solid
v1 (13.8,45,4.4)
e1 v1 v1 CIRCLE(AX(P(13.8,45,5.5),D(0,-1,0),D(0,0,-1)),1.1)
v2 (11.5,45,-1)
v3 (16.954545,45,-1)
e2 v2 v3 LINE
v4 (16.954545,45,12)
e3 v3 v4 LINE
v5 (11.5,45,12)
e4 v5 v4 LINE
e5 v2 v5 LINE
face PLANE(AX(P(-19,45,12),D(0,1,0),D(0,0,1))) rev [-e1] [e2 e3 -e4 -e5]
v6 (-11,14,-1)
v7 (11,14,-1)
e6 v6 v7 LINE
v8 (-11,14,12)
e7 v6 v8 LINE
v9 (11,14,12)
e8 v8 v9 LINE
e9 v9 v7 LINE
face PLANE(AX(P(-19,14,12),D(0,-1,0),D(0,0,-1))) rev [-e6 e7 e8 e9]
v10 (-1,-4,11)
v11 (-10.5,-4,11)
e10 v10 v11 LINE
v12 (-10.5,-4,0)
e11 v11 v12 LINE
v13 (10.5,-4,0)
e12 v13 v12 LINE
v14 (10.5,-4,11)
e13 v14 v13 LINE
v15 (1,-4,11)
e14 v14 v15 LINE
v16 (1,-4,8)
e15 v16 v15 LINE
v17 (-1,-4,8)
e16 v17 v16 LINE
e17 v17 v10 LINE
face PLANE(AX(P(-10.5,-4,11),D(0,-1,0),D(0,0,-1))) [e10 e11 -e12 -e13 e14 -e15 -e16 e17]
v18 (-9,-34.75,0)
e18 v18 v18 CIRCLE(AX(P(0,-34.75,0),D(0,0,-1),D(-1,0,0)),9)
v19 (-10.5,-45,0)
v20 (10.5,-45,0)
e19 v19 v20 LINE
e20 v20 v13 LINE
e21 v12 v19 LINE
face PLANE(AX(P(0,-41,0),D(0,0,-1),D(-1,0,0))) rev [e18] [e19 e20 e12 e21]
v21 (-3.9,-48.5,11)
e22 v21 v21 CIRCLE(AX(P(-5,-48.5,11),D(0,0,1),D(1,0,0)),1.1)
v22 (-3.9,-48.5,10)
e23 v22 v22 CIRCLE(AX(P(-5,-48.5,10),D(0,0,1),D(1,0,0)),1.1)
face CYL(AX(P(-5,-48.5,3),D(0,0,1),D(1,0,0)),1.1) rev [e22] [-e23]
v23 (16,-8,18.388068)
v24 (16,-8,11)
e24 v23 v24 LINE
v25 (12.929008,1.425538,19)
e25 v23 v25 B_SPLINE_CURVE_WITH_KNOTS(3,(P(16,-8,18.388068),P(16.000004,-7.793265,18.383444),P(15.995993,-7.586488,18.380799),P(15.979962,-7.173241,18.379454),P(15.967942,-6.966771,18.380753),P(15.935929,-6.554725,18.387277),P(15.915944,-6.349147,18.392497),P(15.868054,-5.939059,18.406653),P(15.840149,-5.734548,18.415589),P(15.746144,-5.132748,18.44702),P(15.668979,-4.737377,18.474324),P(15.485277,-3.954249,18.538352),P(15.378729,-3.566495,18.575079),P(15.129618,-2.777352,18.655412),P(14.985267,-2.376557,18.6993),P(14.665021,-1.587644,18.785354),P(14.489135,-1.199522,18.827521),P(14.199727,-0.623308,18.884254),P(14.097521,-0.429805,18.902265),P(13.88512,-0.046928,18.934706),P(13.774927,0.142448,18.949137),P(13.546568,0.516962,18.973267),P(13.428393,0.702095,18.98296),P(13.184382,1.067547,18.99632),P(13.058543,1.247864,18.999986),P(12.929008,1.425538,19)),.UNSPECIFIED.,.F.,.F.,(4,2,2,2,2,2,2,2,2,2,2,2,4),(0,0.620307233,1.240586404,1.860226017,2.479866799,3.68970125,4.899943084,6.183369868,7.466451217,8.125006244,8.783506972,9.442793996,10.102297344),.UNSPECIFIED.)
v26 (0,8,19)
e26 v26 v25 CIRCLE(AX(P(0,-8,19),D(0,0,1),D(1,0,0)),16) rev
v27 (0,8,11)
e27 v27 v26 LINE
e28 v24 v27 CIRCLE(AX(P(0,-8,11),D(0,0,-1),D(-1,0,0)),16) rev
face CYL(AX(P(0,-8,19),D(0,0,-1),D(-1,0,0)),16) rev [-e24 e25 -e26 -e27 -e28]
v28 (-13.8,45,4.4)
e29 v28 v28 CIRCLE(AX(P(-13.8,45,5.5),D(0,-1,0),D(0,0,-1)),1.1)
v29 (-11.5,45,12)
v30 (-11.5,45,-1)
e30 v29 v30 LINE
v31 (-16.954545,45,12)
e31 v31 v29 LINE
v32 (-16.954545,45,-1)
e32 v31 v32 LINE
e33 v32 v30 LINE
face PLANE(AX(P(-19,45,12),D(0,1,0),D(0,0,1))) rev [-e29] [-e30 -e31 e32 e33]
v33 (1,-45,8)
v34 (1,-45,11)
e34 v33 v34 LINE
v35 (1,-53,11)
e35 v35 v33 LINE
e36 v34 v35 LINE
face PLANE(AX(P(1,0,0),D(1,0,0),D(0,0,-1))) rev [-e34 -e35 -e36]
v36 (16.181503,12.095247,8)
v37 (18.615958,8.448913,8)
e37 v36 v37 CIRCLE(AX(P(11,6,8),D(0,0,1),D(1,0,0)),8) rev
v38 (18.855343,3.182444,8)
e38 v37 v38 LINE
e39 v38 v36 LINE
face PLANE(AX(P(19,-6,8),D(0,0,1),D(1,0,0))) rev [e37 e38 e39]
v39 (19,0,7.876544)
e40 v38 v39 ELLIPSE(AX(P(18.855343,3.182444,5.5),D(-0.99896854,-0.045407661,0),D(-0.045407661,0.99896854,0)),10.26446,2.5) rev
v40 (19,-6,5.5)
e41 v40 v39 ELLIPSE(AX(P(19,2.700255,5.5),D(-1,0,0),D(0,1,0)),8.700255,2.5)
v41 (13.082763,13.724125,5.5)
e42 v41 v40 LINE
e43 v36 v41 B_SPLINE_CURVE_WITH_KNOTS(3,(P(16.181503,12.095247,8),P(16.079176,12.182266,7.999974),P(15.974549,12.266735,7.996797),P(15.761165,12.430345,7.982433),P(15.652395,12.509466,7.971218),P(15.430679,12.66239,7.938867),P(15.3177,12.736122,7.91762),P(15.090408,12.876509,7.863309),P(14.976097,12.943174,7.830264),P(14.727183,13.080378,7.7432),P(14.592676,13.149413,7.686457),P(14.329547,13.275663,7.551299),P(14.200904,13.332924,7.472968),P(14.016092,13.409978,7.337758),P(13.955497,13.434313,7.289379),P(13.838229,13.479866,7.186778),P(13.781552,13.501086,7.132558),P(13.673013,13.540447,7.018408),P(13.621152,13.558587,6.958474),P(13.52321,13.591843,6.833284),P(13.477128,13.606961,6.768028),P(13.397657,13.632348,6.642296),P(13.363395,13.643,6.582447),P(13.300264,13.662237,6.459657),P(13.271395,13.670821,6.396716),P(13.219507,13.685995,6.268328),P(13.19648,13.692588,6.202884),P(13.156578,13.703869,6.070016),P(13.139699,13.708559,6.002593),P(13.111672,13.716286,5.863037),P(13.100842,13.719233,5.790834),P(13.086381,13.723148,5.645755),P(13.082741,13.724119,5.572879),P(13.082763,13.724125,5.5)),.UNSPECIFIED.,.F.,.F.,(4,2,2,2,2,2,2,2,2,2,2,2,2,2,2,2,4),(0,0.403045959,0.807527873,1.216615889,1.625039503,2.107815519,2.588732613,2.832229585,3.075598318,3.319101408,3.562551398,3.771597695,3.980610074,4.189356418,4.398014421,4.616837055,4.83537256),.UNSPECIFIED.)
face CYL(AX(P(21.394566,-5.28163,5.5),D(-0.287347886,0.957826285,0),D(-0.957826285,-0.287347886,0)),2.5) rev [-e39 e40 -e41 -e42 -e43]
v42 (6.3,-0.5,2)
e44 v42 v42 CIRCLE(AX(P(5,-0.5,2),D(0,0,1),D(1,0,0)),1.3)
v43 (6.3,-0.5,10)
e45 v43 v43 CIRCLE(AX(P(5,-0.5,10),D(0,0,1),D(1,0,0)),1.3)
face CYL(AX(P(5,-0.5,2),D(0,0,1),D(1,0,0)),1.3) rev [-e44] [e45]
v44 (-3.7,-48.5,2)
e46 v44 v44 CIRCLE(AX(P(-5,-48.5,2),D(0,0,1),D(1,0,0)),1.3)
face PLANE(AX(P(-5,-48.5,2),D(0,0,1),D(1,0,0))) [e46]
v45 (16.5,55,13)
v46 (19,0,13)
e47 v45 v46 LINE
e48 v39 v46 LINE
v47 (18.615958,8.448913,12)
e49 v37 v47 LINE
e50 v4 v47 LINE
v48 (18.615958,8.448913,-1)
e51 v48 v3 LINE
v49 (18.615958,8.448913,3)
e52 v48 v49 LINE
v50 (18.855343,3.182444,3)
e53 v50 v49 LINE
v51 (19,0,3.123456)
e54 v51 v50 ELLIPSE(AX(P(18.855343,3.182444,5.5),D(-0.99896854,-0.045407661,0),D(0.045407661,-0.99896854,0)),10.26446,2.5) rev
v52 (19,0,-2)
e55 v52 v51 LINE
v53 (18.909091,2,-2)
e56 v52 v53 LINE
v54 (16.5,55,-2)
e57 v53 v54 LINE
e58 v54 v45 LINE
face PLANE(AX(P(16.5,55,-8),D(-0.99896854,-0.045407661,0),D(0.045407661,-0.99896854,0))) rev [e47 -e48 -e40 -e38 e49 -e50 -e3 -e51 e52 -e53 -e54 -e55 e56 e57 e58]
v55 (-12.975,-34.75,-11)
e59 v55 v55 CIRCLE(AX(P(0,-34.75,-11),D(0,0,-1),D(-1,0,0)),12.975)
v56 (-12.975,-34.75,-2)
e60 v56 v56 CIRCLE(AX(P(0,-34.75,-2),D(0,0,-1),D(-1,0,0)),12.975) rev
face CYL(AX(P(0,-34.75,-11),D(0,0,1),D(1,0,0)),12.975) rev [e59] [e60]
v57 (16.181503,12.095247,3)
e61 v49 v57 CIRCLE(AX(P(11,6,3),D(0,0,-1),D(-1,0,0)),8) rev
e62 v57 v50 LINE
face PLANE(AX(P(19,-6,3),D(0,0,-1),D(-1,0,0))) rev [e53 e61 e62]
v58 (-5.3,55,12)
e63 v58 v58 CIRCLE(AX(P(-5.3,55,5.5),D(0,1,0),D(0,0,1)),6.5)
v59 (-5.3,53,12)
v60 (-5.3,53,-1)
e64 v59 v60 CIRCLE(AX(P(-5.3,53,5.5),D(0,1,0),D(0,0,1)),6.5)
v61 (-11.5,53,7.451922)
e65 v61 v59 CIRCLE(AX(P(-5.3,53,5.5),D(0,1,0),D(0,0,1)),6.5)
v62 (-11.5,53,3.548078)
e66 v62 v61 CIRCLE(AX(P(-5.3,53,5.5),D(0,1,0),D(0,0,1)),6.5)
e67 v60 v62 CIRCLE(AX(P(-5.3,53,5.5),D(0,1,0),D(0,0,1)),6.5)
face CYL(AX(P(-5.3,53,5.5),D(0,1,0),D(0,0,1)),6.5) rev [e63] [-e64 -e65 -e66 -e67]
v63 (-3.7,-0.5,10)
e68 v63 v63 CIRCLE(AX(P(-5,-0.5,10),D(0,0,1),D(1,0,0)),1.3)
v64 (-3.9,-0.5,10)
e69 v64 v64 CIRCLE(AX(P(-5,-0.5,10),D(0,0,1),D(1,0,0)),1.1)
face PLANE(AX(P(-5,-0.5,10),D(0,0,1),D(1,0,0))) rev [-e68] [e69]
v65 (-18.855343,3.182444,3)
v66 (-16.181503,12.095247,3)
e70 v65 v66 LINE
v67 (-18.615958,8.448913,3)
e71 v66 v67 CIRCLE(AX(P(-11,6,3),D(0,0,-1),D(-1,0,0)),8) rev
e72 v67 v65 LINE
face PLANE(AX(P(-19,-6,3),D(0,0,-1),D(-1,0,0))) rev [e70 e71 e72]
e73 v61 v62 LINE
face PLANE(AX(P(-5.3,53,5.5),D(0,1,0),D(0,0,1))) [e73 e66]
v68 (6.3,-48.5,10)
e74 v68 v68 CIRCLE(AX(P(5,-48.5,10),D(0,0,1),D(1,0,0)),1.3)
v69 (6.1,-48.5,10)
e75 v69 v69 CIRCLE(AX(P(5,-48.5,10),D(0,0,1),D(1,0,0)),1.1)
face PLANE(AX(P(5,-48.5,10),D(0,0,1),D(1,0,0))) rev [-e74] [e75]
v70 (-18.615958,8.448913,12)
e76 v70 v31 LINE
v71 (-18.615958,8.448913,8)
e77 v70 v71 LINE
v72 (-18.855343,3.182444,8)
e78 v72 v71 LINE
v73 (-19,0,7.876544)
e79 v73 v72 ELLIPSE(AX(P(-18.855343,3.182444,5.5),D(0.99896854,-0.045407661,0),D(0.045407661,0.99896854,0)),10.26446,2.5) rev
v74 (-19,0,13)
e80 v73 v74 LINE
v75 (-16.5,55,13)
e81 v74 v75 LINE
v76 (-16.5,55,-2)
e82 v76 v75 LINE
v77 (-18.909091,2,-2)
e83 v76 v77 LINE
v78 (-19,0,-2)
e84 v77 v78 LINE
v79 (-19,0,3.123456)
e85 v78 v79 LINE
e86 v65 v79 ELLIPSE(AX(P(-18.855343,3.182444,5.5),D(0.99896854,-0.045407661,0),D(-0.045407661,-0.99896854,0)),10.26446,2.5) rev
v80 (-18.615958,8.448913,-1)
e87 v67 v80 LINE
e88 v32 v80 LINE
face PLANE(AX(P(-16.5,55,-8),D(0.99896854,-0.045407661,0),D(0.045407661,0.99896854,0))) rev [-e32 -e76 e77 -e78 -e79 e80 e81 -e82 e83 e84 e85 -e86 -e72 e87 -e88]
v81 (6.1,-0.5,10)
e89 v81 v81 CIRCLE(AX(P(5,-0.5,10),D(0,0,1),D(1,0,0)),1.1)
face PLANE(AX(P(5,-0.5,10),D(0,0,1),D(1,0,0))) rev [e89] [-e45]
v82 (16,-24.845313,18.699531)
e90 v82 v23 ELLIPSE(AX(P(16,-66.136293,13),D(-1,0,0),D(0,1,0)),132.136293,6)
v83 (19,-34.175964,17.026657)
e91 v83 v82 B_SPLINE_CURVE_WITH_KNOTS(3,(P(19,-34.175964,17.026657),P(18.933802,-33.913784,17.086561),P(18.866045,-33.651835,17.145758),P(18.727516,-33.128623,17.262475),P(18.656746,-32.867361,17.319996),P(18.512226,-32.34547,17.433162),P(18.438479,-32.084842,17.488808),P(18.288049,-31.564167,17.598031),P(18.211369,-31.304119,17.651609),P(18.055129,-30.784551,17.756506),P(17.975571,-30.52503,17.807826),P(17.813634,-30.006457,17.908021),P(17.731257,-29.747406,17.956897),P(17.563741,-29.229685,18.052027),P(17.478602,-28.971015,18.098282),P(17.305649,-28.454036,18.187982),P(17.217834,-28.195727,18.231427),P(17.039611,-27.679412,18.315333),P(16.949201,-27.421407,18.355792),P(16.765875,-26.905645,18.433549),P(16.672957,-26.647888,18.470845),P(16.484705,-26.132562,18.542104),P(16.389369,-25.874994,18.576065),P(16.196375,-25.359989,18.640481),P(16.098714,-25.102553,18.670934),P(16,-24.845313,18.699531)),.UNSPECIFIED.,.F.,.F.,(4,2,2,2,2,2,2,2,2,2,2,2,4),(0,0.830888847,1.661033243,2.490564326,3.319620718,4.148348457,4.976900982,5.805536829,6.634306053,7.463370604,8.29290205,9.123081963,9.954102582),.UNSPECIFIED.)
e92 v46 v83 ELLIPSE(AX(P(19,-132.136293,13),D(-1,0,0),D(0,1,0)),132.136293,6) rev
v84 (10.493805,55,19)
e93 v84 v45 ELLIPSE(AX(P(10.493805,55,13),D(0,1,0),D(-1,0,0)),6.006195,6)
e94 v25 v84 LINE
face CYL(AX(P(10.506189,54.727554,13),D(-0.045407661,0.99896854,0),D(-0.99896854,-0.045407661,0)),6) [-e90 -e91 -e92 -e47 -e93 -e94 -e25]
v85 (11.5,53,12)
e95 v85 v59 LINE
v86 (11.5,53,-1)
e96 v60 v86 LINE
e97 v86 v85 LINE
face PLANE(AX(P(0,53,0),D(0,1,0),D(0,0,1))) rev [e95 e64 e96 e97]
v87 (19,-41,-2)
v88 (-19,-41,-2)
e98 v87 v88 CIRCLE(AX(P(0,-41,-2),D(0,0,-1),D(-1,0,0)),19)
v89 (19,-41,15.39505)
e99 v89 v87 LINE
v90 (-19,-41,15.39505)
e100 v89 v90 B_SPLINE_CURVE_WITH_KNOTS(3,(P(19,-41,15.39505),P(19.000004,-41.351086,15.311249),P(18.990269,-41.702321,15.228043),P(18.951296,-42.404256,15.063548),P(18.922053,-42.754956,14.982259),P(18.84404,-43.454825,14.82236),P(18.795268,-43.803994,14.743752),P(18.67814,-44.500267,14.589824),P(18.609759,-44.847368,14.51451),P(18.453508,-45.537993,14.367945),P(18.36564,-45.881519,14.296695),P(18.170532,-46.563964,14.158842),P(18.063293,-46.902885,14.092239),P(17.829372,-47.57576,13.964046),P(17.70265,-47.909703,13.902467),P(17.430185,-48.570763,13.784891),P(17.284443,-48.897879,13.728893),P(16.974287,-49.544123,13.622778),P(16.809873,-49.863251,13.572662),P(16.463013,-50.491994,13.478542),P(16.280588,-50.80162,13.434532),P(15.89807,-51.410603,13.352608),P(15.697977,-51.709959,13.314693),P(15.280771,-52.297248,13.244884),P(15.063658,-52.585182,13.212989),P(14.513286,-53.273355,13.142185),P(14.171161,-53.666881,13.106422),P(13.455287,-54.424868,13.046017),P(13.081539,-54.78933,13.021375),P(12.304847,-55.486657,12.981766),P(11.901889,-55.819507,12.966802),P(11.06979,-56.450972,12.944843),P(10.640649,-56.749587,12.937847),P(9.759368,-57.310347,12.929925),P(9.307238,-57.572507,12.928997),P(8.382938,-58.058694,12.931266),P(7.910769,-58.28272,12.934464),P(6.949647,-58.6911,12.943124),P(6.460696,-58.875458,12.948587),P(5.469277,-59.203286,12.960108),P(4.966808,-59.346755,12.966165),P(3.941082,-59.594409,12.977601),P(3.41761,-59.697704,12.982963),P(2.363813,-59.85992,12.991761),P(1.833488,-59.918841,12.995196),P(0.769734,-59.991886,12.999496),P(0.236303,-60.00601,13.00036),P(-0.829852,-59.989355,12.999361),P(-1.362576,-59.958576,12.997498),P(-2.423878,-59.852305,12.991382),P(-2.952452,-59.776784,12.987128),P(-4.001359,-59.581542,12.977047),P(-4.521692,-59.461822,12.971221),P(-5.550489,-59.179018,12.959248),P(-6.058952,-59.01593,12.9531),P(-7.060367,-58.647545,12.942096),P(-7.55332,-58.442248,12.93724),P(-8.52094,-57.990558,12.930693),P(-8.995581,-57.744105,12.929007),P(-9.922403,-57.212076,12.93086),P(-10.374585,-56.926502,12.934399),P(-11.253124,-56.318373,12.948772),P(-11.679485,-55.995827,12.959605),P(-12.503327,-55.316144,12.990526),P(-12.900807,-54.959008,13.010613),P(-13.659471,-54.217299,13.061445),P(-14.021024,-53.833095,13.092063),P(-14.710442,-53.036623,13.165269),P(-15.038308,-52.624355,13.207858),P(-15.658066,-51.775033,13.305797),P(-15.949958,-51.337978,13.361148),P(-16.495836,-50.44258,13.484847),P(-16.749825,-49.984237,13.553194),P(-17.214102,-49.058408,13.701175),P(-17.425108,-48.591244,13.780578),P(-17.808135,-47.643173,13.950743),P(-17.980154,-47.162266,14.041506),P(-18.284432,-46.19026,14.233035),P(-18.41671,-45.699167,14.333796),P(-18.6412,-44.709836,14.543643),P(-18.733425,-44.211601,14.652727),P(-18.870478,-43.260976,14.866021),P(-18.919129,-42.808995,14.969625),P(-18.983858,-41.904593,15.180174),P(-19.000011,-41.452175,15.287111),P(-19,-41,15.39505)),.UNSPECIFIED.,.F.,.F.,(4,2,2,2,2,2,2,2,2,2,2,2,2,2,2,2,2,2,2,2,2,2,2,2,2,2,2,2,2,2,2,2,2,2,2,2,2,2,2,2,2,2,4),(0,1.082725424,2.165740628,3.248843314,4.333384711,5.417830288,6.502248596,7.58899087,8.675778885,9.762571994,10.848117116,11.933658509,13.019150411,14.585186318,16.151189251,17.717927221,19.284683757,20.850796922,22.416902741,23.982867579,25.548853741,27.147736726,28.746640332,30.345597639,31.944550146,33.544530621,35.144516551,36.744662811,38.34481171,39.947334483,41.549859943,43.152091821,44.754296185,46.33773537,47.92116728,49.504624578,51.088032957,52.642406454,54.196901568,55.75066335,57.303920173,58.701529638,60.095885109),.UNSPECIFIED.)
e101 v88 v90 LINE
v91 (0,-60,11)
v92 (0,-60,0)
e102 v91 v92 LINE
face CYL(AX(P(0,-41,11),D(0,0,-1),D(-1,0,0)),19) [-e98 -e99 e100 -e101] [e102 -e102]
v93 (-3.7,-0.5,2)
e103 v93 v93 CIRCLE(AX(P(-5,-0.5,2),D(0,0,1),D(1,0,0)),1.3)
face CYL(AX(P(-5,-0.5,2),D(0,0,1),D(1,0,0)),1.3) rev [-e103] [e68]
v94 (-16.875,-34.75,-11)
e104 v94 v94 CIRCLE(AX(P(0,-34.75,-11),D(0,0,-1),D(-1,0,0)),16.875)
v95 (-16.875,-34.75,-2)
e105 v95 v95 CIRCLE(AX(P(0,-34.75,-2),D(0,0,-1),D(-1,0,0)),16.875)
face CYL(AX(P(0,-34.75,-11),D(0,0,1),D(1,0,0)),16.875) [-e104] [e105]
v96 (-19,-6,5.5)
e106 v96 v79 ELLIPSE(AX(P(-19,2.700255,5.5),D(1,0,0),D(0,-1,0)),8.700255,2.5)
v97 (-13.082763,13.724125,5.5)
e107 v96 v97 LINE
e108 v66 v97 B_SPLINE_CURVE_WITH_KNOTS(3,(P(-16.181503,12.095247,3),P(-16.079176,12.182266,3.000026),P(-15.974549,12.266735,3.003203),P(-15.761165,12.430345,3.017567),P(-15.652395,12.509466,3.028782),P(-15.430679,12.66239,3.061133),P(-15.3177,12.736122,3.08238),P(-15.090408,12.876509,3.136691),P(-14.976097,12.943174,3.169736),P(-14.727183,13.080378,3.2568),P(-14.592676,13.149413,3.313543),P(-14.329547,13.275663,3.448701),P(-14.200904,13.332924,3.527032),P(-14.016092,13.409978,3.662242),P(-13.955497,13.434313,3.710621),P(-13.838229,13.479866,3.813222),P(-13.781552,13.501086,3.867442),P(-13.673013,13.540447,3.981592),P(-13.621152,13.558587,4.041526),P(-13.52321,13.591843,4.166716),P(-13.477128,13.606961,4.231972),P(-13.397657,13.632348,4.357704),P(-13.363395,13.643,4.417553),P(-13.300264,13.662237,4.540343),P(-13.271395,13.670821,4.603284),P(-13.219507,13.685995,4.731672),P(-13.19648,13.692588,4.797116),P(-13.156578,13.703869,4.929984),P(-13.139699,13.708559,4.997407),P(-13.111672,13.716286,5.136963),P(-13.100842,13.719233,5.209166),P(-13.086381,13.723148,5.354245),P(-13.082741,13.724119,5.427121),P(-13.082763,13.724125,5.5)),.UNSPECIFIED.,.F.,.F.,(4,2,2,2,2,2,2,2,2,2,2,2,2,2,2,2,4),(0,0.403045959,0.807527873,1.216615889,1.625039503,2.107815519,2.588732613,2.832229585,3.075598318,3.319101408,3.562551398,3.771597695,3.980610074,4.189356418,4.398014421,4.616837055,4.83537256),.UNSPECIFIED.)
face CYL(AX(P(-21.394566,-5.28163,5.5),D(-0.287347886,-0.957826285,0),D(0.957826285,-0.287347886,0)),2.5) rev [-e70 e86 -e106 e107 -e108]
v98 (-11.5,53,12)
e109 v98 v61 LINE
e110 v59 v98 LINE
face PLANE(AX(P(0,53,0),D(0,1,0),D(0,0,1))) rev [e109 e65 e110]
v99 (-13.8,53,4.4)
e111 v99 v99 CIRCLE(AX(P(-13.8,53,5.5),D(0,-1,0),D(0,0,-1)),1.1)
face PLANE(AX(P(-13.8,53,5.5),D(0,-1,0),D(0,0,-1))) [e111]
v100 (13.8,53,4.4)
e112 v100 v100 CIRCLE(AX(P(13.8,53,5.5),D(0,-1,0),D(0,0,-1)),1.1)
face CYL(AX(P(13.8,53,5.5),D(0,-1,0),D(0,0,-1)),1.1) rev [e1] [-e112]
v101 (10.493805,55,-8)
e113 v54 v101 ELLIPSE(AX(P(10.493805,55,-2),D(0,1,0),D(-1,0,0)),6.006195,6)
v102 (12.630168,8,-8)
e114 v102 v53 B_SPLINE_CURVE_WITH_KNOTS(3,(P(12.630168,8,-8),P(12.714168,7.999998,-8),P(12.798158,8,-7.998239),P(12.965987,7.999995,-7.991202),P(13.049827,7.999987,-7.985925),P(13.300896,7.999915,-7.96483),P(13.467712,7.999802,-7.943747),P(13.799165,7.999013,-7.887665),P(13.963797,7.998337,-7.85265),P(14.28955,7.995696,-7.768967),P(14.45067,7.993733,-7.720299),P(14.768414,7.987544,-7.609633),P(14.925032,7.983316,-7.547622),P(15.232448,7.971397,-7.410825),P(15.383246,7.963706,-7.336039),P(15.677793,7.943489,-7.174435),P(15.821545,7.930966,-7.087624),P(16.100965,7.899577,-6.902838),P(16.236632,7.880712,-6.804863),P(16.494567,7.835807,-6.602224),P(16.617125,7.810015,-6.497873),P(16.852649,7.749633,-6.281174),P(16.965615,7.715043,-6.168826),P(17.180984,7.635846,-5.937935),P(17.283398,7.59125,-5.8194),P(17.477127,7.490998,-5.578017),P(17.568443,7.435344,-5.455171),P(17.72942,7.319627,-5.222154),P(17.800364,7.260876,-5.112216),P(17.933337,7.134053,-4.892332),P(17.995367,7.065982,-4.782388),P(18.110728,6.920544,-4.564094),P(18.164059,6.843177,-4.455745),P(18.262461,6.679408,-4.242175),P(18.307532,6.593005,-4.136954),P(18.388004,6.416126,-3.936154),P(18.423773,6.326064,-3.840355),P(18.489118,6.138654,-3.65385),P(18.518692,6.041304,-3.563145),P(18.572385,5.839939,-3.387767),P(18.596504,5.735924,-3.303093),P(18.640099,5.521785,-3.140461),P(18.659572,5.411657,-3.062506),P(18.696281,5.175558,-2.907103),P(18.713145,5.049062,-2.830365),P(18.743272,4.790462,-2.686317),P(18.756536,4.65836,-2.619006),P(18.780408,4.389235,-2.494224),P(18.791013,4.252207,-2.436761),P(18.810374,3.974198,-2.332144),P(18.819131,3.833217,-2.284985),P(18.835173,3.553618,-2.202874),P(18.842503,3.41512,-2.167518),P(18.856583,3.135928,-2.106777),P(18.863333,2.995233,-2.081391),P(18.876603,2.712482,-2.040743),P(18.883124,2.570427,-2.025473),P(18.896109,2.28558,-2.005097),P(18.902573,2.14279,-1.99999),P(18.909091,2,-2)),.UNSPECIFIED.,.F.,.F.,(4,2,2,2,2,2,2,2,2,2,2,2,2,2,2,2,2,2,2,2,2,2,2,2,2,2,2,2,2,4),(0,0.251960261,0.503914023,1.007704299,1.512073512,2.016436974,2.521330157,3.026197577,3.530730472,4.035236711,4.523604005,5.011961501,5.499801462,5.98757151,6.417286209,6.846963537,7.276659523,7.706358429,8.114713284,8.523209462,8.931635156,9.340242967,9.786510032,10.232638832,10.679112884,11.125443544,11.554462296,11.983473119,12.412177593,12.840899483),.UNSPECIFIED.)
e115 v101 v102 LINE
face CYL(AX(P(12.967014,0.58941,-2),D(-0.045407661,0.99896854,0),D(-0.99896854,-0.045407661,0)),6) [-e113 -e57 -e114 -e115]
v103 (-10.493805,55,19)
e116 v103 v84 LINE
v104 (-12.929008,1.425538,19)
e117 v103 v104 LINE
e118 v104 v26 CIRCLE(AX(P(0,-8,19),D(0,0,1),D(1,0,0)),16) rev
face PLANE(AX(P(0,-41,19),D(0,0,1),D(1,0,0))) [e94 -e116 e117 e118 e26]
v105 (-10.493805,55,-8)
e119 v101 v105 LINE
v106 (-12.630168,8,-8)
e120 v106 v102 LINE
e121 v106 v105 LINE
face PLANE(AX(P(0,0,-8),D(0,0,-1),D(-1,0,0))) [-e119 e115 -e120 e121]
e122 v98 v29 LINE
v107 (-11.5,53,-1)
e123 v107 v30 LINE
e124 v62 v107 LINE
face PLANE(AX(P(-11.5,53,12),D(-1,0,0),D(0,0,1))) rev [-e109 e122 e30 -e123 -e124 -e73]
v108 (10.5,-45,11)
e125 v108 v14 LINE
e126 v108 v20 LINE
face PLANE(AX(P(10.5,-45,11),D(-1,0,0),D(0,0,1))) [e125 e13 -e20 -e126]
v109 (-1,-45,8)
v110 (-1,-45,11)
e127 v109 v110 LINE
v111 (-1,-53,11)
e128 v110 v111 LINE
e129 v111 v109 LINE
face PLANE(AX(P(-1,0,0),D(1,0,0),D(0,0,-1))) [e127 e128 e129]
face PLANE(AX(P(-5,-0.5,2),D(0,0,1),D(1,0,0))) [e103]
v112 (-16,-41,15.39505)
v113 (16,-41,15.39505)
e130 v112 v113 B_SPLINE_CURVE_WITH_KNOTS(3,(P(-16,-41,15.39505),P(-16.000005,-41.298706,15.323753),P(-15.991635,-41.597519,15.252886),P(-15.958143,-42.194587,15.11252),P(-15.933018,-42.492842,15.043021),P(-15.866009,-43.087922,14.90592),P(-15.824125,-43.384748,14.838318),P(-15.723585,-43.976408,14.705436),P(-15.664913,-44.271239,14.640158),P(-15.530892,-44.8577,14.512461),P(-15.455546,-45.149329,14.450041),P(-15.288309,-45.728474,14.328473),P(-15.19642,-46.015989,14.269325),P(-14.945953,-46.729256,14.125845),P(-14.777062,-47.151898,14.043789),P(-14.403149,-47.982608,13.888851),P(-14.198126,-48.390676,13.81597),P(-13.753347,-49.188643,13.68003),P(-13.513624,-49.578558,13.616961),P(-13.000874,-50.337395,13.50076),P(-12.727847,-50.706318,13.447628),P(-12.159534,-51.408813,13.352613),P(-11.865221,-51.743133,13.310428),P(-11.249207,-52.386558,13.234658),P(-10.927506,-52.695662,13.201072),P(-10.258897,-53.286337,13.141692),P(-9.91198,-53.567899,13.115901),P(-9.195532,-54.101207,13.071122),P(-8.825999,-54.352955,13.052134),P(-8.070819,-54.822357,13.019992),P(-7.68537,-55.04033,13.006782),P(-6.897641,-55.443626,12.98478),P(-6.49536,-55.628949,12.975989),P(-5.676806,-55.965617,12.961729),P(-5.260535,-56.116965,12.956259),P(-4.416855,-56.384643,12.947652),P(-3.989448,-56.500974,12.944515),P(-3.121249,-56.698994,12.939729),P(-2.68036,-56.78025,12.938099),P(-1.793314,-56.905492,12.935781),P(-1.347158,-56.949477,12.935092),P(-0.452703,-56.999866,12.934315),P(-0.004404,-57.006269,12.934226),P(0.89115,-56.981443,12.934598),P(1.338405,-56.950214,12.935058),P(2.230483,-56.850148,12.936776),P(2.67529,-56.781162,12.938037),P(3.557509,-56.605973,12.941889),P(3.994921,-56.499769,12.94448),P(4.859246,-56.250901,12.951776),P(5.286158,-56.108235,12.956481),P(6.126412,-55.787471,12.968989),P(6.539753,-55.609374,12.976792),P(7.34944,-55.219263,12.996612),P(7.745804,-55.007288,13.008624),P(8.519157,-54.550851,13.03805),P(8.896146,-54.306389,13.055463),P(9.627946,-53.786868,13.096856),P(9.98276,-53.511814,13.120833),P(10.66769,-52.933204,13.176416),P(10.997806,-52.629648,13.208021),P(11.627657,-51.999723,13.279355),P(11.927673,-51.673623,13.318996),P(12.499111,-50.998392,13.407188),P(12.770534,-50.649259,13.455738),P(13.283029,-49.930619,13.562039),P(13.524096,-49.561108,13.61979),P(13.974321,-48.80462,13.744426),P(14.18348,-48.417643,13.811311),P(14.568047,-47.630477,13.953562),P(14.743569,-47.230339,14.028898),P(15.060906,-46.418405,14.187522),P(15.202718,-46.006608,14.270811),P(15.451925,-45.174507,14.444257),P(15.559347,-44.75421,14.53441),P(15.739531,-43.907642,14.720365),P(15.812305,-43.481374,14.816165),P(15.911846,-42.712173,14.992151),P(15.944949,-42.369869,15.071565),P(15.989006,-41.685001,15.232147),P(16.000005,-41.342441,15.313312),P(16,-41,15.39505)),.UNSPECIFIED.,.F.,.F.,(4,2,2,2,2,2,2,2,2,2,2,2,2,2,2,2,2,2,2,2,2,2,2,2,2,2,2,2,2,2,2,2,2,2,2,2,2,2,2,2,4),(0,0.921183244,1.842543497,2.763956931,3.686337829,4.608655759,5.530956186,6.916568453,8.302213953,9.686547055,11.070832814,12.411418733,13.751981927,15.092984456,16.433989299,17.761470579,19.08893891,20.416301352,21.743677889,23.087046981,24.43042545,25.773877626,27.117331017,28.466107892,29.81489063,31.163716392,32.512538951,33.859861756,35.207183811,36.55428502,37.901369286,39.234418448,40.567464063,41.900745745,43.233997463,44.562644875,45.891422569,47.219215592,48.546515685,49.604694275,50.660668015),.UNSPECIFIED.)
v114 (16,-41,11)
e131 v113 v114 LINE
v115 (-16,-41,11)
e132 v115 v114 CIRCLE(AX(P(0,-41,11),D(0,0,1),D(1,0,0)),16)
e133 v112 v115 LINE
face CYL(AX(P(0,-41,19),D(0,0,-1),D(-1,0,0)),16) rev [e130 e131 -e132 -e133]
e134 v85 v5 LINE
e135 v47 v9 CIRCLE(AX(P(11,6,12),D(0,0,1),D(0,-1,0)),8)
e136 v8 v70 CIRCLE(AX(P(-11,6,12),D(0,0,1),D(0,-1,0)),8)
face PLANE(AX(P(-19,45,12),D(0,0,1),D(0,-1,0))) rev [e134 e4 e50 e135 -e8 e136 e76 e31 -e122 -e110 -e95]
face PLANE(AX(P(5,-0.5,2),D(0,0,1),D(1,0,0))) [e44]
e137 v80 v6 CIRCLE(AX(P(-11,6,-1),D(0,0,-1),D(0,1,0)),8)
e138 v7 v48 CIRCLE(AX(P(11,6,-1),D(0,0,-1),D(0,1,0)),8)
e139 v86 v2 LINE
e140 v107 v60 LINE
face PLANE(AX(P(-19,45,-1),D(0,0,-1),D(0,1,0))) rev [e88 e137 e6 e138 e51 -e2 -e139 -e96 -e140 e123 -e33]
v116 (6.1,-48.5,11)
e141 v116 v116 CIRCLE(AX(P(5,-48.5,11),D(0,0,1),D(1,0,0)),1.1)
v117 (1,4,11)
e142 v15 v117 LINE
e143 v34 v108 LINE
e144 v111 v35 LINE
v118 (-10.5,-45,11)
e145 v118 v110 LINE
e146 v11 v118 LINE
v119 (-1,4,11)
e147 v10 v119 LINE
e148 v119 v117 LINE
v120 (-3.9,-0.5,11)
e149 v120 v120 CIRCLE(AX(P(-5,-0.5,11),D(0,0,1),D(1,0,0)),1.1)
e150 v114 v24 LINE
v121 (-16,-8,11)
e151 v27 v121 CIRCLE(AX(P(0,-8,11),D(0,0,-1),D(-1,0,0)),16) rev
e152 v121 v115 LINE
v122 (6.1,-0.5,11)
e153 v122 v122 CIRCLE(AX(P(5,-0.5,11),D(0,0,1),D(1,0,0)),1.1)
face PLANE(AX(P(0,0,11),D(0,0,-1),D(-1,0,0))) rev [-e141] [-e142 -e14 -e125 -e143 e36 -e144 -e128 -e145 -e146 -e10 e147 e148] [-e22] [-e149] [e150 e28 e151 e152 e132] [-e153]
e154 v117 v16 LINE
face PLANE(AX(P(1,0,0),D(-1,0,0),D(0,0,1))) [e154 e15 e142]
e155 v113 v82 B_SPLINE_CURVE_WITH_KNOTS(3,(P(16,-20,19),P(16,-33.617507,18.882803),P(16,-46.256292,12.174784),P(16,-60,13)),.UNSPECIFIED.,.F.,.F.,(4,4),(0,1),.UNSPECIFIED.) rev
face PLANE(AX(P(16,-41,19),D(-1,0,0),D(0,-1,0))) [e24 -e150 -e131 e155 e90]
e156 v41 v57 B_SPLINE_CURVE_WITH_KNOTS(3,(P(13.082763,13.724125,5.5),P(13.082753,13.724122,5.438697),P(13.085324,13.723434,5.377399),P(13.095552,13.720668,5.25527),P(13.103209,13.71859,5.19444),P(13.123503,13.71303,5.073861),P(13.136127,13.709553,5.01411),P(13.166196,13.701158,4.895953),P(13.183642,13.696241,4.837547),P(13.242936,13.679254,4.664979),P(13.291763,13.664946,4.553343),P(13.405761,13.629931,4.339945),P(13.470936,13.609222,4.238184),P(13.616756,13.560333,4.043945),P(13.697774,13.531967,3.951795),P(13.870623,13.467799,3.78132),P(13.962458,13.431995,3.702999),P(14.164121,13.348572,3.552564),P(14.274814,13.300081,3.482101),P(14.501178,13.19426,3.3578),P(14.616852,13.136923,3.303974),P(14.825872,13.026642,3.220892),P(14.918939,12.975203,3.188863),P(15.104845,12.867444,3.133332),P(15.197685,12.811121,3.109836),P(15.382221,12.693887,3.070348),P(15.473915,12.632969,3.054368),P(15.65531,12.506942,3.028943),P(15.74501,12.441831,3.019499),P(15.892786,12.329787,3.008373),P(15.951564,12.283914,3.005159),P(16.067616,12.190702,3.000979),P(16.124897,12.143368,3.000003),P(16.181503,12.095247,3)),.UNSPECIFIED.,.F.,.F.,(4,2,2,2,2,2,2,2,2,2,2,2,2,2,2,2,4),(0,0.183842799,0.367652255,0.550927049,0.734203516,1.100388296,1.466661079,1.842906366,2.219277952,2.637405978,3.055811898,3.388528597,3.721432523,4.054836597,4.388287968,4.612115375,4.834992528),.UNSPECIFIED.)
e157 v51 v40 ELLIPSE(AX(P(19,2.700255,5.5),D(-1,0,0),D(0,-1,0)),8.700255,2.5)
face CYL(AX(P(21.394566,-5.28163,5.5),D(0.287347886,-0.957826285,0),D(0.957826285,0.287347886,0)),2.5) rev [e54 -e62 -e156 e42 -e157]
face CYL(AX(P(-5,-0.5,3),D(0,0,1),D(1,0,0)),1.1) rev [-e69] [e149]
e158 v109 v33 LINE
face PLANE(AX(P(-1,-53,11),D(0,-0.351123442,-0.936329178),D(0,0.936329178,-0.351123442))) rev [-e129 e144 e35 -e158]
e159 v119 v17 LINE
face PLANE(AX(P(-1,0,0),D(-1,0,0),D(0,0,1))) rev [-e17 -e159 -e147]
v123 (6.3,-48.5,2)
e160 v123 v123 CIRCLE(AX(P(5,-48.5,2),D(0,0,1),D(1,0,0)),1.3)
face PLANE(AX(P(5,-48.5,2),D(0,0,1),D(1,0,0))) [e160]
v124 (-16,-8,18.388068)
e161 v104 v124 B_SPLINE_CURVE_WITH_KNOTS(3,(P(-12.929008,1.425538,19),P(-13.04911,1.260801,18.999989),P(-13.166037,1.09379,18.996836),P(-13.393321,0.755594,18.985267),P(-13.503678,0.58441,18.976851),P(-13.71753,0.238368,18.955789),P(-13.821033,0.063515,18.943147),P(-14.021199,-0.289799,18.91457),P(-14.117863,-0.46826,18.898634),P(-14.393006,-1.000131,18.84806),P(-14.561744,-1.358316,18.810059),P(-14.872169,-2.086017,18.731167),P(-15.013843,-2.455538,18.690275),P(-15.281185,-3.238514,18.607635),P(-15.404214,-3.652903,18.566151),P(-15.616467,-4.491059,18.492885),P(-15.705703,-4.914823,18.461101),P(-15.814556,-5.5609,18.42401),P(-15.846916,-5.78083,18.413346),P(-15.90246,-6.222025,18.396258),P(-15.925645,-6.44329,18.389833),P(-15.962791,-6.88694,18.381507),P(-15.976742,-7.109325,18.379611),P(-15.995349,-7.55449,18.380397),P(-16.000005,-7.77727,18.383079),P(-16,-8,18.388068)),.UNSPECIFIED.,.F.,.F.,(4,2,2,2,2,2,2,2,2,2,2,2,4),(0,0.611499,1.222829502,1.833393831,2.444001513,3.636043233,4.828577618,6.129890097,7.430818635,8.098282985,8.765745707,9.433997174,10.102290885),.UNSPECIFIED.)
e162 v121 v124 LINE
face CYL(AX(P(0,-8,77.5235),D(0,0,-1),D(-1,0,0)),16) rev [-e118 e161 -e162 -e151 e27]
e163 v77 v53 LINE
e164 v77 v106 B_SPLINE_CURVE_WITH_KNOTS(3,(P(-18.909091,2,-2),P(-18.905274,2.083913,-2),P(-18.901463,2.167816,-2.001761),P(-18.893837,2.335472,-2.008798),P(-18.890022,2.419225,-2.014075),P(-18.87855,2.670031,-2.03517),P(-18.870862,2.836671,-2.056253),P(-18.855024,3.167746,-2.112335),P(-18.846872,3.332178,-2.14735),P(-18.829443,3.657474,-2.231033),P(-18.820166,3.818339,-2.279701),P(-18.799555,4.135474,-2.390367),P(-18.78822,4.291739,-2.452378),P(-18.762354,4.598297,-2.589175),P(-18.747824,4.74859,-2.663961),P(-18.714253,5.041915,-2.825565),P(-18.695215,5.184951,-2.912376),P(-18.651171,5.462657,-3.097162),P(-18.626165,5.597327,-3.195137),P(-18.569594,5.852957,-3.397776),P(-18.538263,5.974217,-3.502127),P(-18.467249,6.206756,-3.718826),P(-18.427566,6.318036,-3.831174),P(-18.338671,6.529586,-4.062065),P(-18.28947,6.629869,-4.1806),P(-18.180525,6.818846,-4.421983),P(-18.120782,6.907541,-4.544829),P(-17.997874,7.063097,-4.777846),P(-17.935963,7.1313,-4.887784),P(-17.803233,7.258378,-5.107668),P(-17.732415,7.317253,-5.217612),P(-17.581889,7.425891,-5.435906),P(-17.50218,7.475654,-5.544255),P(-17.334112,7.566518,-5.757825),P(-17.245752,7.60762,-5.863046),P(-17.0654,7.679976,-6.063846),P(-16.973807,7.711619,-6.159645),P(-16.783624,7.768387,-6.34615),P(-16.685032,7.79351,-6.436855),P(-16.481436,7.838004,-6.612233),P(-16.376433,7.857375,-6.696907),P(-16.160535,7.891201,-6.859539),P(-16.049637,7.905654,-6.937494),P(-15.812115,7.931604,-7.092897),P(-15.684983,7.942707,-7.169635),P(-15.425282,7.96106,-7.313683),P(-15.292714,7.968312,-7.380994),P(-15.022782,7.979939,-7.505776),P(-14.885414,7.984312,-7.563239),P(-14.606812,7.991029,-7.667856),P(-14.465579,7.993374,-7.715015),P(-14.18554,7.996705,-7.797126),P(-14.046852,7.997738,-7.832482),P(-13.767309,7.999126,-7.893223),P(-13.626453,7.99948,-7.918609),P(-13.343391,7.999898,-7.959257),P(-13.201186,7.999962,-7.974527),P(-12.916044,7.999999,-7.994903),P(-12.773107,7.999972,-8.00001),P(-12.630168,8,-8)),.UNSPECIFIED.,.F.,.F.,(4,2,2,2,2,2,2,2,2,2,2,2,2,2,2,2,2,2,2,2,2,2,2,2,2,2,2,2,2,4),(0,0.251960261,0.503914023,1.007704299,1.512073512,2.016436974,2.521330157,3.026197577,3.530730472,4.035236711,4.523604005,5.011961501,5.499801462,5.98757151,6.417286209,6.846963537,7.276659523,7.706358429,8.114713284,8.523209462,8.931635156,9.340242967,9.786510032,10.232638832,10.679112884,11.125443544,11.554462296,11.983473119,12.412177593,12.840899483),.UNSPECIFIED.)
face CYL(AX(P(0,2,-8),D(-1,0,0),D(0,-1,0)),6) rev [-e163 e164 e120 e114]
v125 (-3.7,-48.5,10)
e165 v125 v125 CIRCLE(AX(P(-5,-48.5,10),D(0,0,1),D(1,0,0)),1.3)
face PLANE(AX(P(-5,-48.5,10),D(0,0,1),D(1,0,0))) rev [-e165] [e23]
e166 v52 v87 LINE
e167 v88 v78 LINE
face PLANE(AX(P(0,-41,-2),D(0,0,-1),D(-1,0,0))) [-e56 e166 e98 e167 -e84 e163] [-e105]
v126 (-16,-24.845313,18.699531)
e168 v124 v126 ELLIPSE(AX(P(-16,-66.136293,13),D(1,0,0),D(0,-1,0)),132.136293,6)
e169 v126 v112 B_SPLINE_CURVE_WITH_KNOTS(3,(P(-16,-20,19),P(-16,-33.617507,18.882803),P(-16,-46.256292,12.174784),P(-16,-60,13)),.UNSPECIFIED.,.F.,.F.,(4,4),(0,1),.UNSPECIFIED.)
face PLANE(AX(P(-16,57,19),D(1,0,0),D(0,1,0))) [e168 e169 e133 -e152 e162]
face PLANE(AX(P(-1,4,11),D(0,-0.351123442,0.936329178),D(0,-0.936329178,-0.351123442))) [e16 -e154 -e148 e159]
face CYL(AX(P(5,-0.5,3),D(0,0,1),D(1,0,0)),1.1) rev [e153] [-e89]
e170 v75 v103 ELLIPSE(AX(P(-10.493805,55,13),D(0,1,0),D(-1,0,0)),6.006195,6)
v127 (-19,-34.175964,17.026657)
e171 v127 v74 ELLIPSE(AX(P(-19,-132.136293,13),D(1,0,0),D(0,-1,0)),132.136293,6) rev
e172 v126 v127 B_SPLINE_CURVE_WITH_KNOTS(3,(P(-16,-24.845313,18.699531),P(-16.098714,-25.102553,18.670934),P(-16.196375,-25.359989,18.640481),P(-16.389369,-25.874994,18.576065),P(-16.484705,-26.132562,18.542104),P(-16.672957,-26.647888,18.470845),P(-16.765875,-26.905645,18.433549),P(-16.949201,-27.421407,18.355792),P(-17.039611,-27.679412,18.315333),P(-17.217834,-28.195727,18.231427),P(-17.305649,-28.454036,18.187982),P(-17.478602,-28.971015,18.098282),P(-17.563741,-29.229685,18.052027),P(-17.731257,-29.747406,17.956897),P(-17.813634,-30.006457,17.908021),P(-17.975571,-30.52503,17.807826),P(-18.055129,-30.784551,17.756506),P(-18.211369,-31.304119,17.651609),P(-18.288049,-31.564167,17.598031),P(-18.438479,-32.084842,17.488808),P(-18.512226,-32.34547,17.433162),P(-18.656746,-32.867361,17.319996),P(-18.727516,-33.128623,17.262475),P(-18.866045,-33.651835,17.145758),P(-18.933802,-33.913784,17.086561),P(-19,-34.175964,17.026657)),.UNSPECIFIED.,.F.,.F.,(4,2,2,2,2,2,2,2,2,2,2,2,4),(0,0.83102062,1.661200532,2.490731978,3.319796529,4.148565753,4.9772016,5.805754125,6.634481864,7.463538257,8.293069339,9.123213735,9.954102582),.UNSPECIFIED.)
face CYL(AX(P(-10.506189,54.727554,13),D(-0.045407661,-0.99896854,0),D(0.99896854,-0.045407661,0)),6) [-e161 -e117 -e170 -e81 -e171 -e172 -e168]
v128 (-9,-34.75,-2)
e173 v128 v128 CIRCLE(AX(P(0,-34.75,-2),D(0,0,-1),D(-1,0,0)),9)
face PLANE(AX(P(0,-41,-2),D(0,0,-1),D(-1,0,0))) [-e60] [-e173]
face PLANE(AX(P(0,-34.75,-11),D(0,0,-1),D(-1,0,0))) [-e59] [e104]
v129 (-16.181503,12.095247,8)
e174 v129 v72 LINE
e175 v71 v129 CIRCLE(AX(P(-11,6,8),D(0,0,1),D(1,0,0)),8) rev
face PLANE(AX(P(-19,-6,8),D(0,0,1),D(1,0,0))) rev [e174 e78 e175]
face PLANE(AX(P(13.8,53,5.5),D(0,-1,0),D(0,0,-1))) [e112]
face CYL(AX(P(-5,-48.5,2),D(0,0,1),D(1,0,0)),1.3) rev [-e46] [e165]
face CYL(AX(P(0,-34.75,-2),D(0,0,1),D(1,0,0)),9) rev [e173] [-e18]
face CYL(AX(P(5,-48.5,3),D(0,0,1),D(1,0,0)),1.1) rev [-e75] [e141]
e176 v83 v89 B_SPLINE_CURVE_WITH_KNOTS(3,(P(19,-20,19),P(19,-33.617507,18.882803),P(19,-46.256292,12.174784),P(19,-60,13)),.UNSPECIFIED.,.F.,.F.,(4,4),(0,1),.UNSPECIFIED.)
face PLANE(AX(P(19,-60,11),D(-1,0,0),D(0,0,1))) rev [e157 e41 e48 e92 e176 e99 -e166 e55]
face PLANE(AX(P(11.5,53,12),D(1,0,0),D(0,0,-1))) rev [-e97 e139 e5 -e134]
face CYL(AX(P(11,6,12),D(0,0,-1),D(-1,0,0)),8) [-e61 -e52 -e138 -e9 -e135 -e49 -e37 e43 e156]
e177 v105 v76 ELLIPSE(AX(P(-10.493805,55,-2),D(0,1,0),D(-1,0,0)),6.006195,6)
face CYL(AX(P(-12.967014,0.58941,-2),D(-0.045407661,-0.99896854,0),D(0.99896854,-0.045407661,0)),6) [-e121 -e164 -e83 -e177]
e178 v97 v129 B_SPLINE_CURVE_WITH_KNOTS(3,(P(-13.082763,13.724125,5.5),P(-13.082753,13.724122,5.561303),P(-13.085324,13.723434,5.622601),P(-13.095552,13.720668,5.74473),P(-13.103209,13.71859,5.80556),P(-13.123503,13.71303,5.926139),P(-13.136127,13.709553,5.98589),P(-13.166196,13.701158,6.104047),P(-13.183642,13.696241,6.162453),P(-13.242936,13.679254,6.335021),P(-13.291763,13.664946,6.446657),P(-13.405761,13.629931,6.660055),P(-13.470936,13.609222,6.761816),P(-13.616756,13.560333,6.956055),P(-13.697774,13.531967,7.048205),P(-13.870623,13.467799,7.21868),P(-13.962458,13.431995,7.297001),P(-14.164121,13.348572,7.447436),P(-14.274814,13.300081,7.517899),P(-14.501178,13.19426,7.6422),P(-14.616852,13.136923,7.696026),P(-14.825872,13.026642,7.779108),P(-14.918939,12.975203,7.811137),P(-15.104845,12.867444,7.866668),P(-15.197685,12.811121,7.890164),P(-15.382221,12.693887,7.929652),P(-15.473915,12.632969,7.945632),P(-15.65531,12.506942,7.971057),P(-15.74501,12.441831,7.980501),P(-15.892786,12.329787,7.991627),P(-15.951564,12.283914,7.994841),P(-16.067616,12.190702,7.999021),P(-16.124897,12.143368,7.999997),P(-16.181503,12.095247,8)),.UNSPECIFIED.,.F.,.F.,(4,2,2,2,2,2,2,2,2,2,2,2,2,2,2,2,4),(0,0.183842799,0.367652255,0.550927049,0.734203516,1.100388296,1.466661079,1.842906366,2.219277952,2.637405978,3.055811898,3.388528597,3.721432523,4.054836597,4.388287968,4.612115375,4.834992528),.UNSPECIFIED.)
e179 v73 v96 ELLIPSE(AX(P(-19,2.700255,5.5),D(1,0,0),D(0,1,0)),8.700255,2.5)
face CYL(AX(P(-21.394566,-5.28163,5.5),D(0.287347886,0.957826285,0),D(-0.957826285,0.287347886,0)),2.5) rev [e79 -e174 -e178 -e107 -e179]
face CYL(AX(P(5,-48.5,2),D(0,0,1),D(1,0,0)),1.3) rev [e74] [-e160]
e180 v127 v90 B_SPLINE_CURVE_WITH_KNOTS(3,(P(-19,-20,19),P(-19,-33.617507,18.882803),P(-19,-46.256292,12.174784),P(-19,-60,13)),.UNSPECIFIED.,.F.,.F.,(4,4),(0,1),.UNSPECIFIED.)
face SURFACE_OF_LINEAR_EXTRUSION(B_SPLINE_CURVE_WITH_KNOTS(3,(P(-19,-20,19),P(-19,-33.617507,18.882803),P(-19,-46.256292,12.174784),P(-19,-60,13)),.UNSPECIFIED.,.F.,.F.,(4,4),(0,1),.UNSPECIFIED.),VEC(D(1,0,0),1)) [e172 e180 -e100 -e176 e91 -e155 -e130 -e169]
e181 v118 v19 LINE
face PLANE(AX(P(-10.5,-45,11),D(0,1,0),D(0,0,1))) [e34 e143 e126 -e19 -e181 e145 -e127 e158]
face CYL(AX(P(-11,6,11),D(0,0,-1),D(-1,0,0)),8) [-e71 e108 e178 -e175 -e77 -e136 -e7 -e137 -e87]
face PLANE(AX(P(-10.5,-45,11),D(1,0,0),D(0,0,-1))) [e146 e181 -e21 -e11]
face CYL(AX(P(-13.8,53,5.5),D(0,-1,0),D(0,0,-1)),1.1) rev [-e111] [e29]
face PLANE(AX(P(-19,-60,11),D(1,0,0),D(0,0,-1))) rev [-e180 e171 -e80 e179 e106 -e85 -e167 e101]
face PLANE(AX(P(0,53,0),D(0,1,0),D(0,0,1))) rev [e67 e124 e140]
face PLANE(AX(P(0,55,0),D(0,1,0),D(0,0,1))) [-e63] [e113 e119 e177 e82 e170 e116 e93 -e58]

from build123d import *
from OCP.BRepFilletAPI import BRepFilletAPI_MakeChamfer

# Parameters (mm, degrees)
SKETCH1_W               = 38
SKETCH1_H               = 120
SKETCH1_W_2             = 21
SKETCH1_H_2             = 41
BOSS_EXTRUDE1_DEPTH     = 11
SKETCH3_R               = 1.3
CUT_EXTRUDE1_DEPTH      = 8
FILLET3_R               = 19
BOSS_EXTRUDE2_DEPTH     = 8
CUT_EXTRUDE2_DEPTH      = 66.741919656
CUT_EXTRUDE2_DEPTH_BACK = 66.741919656
SKETCH7_W               = 32
SKETCH7_H               = 49
BOSS_EXTRUDE4_DEPTH     = 8
SKETCH8_W               = 38
SKETCH8_H               = 52
BOSS_EXTRUDE5_DEPTH     = 8
BOSS_EXTRUDE6_START     = 2
SKETCH24_R              = 9
BOSS_EXTRUDE6_DEPTH     = 2
FILLET4_R               = 16
SKETCH26_W              = 38
SKETCH26_H              = 27
CUT_EXTRUDE4_DEPTH      = 5
SKETCH27_W              = 13
SKETCH27_H              = 31
CUT_EXTRUDE5_DEPTH      = 74.518705262
SKETCH29_W              = 23
SKETCH29_H              = 13
CUT_EXTRUDE7_DEPTH      = 8
SKETCH28_R              = 6.5
CUT_EXTRUDE8_DEPTH      = 2
SKETCH30_W              = 6
SKETCH30_H              = 5
CUT_EXTRUDE9_DEPTH      = 20
CHAMFER3_SIZE           = 6
CHAMFER3_SIZE_2         = 20
FILLET6_R               = 8
FILLET7_R               = 6
FILLET10_R              = 2.5
SKETCH31_R              = 1.1
CUT_EXTRUDE10_DEPTH     = 8
SKETCH32_R              = 1.1
CUT_EXTRUDE11_DEPTH     = 8
CUT_EXTRUDE13_DEPTH     = 69.483574828
FILLET11_R              = 6
SKETCH35_R              = 16.875
SKETCH35_R_2            = 12.975
BOSS_EXTRUDE7_DEPTH     = 9
CUT_EXTRUDE14_DEPTH     = 1


# Some blends are built 0.0001 mm under size
with BuildPart() as part:
    # Sketch1 → Boss-Extrude1 (new body)
    with BuildSketch(Plane.XY):
        Rectangle(SKETCH1_W, SKETCH1_H)
        with Locations((0, -24.5)):
            Rectangle(SKETCH1_W_2, SKETCH1_H_2, mode=Mode.SUBTRACT)
    extrude(amount=BOSS_EXTRUDE1_DEPTH)

    # Sketch3 → Cut-Extrude1 (cut)
    with BuildSketch(Plane.XY.offset(10)):
        with Locations((-5, -0.5)):
            Circle(SKETCH3_R)
        with Locations((5, -0.5)):
            Circle(SKETCH3_R)
        with Locations((5, -48.5)):
            Circle(SKETCH3_R)
        with Locations((-5, -48.5)):
            Circle(SKETCH3_R)
    extrude(amount=-CUT_EXTRUDE1_DEPTH, mode=Mode.SUBTRACT)

    # Fillet3
    fillet3_edges = [part.edges().sort_by_distance(p)[0] for p in [
        (19, -60, 5.5),
        (-19, -60, 5.5),
    ]]
    fillet(fillet3_edges, radius=FILLET3_R - 0.0001)  # a hair under: the kernel refuses the full size

    # Sketch4 → Boss-Extrude2 (add)
    with BuildSketch(Plane.XY.offset(11)):
        with BuildLine():
            Line((19, -41), (19, 60))
            Line((19, 60), (-19, 60))
            Line((-19, 60), (-19, -41))
            ThreePointArc((-19, -41), (-13.435028843, -54.435028843), (0, -60))
            ThreePointArc((0, -60), (13.435028843, -54.435028843), (19, -41))
        make_face()
        with BuildLine():
            Line((16, -41), (16, 57))
            Line((16, 57), (-16, 57))
            Line((-16, 57), (-16, -41))
            ThreePointArc((-16, -41), (-11.313708499, -52.313708499), (0, -57))
            ThreePointArc((0, -57), (11.313708499, -52.313708499), (16, -41))
        make_face(mode=Mode.SUBTRACT)
    extrude(amount=BOSS_EXTRUDE2_DEPTH)

    # Sketch6 → Cut-Extrude2 (cut, two sides: drawn at the far end of the back side and taken through both)
    with BuildSketch(Plane(origin=(0, 0, 0), x_dir=(0, 0, -1), z_dir=(1, 0, 0)).offset(-CUT_EXTRUDE2_DEPTH_BACK)):
        with BuildLine():
            Line((-19, -60), (-13, -60))
            Line((-13, -60), (-17, -35))
            Line((-17, -35), (-17.230341833, -33.272436255))
            add(Edge.make_bspline(
                [(-19, -20), (-18.961218666, -24.506149192), (-18.200739257, -28.905127919), (-17.230341833, -33.272436255)],
                knots=[0, 0, 0, 0, 0.330908527, 0.330908527, 0.330908527, 0.330908527], degree=3))
            Line((-19, -20), (-19, -60))
        make_face()
        with BuildLine():
            Line((-17, -35), (-13, -60))
            add(Edge.make_bspline(
                [(-17.230341833, -33.272436255), (-15.268214572, -42.103060212), (-12.44785515, -50.804202435), (-13, -60)],
                knots=[0.330908527, 0.330908527, 0.330908527, 0.330908527, 1, 1, 1, 1], degree=3))
            Line((-17.230341833, -33.272436255), (-17, -35))
        make_face()
    extrude(amount=CUT_EXTRUDE2_DEPTH + CUT_EXTRUDE2_DEPTH_BACK, mode=Mode.SUBTRACT)

    # Sketch7 → Boss-Extrude4 (add)
    with BuildSketch(Plane.XY.offset(11)):
        with Locations((0, 32.5)):
            Rectangle(SKETCH7_W, SKETCH7_H)
    extrude(amount=BOSS_EXTRUDE4_DEPTH)

    # Sketch8 → Boss-Extrude5 (add)
    with BuildSketch(Plane(origin=(0, 0, 0), x_dir=(-1, 0, 0), z_dir=(0, 0, -1))):
        with Locations((0, 34)):
            Rectangle(SKETCH8_W, SKETCH8_H)
    extrude(amount=BOSS_EXTRUDE5_DEPTH)

    # Sketch24 → Boss-Extrude6 (add)
    with BuildSketch(Plane(origin=(0, 0, 0), x_dir=(-1, 0, 0), z_dir=(0, 0, -1)).offset(BOSS_EXTRUDE6_START)):
        with BuildLine():
            Line((-19, 8), (-19, -41))
            ThreePointArc((-19, -41), (-13.435028843, -54.435028843), (0, -60))
            ThreePointArc((0, -60), (13.435028843, -54.435028843), (19, -41))
            Line((19, -41), (19, 8))
            Line((19, 8), (-19, 8))
        make_face()
        with Locations((0, -34.75)):
            Circle(SKETCH24_R, mode=Mode.SUBTRACT)
    extrude(amount=-BOSS_EXTRUDE6_DEPTH)

    # Fillet4
    fillet4_edges = [part.edges().sort_by_distance(p)[0] for p in [
        (-16, 8, 15),
        (16, 8, 15),
    ]]
    fillet(fillet4_edges, radius=FILLET4_R - 0.0001)  # a hair under: the kernel refuses the full size

    # Sketch26 → Cut-Extrude4 (cut)
    with BuildSketch(Plane(origin=(0, 60, 0), x_dir=(1, 0, 0), z_dir=(0, 1, 0))):
        with Locations((0, -5.5)):
            Rectangle(SKETCH26_W, SKETCH26_H)
    extrude(amount=-CUT_EXTRUDE4_DEPTH, mode=Mode.SUBTRACT)

    # Sketch27 → Cut-Extrude5 (cut, through all)
    with BuildSketch(Plane(origin=(19, 0, 0), x_dir=(0, 0, -1), z_dir=(1, 0, 0))):
        with Locations((-5.5, 29.5)):
            Rectangle(SKETCH27_W, SKETCH27_H)
    extrude(amount=-CUT_EXTRUDE5_DEPTH, mode=Mode.SUBTRACT)

    # Sketch29 → Cut-Extrude7 (cut)
    with BuildSketch(Plane.XZ.offset(-45)):
        with Locations((0, 5.5)):
            Rectangle(SKETCH29_W, SKETCH29_H)
    extrude(amount=-CUT_EXTRUDE7_DEPTH, mode=Mode.SUBTRACT)

    # Sketch28 → Cut-Extrude8 (cut)
    with BuildSketch(Plane(origin=(0, 55, 0), x_dir=(1, 0, 0), z_dir=(0, 1, 0))):
        with Locations(Location((-5.3, -5.5, 0), (0, 0, 270))):
            Circle(SKETCH28_R)
    extrude(amount=-CUT_EXTRUDE8_DEPTH, mode=Mode.SUBTRACT)

    # Sketch30 → Cut-Extrude9 (cut)
    with BuildSketch(Plane(origin=(0, 14, 0), x_dir=(1, 0, 0), z_dir=(0, 1, 0))):
        with Locations((-16, -5.5)):
            Rectangle(SKETCH30_W, SKETCH30_H)
        with Locations((16, -5.5)):
            Rectangle(SKETCH30_W, SKETCH30_H)
    extrude(amount=-CUT_EXTRUDE9_DEPTH, mode=Mode.SUBTRACT)

    # Chamfer3
    chamfer3_edges_1 = [part.edges().sort_by_distance(p)[0] for p in [
        (13, -6, 5.5),
    ]]
    chamfer3_side_1 = [part.faces().sort_by_distance(p)[0] for p in [
        (13.12, -6, 5.5),
    ]]
    chamfer3_edges_2 = [part.edges().sort_by_distance(p)[0] for p in [
        (-13, -6, 5.5),
    ]]
    chamfer3_side_2 = [part.faces().sort_by_distance(p)[0] for p in [
        (-13.12, -6, 5.5),
    ]]
    chamfer3 = BRepFilletAPI_MakeChamfer(part.part.solid().wrapped)
    for e in chamfer3_edges_1:
        chamfer3.Add(CHAMFER3_SIZE - 0.0001, CHAMFER3_SIZE_2 - 0.0001, e.wrapped, chamfer3_side_1[0].wrapped)
    for e in chamfer3_edges_2:
        chamfer3.Add(CHAMFER3_SIZE - 0.0001, CHAMFER3_SIZE_2 - 0.0001, e.wrapped, chamfer3_side_2[0].wrapped)
    add(Compound.cast(chamfer3.Shape()), mode=Mode.REPLACE)  # a hair under: the kernel refuses the full size

    # Fillet6
    # the kernel refuses this fillet: 8 mm, written as the material it takes off along each edge
    with BuildSketch(Plane(origin=(-19, 14, -1), x_dir=(1, 0, 0), z_dir=(0, 0, 1))) as fillet6_piece_1_section:
        with BuildLine():
            CenterArc((FILLET6_R, -FILLET6_R), FILLET6_R, 90, 90)
            Line((0, -FILLET6_R), (0, 0))
            Line((0, 0), (FILLET6_R, 0))
        make_face()
    fillet6_piece_1 = extrude(amount=24, mode=Mode.PRIVATE)
    fillet6_piece_1 = split(fillet6_piece_1, bisect_by=Plane(origin=(-12.501601439, 13.924002019, 12), z_dir=(0, 0, -1)), keep=Keep.TOP, mode=Mode.PRIVATE)
    add(fillet6_piece_1, mode=Mode.SUBTRACT)
    with BuildSketch(Plane(origin=(19, 14, -1), x_dir=(-1, 0, 0), z_dir=(0, 0, 1))) as fillet6_piece_2_section:
        with BuildLine():
            CenterArc((FILLET6_R, FILLET6_R), FILLET6_R, 180, 90)
            Line((0, FILLET6_R), (0, 0))
            Line((0, 0), (FILLET6_R, 0))
        make_face()
    fillet6_piece_2 = extrude(amount=24, mode=Mode.PRIVATE)
    fillet6_piece_2 = split(fillet6_piece_2, bisect_by=Plane(origin=(12.501601439, 13.924002019, 12), z_dir=(0, 0, -1)), keep=Keep.TOP, mode=Mode.PRIVATE)
    add(fillet6_piece_2, mode=Mode.SUBTRACT)

    # Fillet7
    fillet7_edges = [part.edges().sort_by_distance(p)[0] for p in [
        (0, 8, -2),
    ]]
    fillet(fillet7_edges, radius=FILLET7_R - 0.0001)  # a hair under: the kernel refuses the full size

    # Fillet10
    fillet10_edges = [part.edges().sort_by_distance(p)[0] for p in [
        (16.041314475, 3.862066808, 3),
        (16.041314475, 3.862066808, 8),
        (-16.041314475, 3.862066808, 3),
        (-16.041314475, 3.862066808, 8),
    ]]
    fillet(fillet10_edges, radius=FILLET10_R - 0.0001)  # a hair under: the kernel refuses the full size

    # Sketch31 → Cut-Extrude10 (cut)
    with BuildSketch(Plane.XY.offset(11)):
        with Locations((-5, -0.5)):
            Circle(SKETCH31_R)
        with Locations((5, -0.5)):
            Circle(SKETCH31_R)
        with Locations((5, -48.5)):
            Circle(SKETCH31_R)
        with Locations((-5, -48.5)):
            Circle(SKETCH31_R)
    extrude(amount=-CUT_EXTRUDE10_DEPTH, mode=Mode.SUBTRACT)

    # Sketch32 → Cut-Extrude11 (cut)
    with BuildSketch(Plane.XZ.offset(-45)):
        with Locations(Location((13.8, 5.5, 0), (0, 0, 270))):
            Circle(SKETCH32_R)
        with Locations(Location((-13.8, 5.5, 0), (0, 0, 270))):
            Circle(SKETCH32_R)
    extrude(amount=-CUT_EXTRUDE11_DEPTH, mode=Mode.SUBTRACT)

    # Sketch34 → Cut-Extrude13 (cut, through all)
    with BuildSketch(Plane.XY.offset(19)):
        Polygon((16.5, 55), (19, 0), (19, 55), align=None)
        Polygon((-16.5, 55), (-19, 0), (-19, 55), align=None)
    extrude(amount=-CUT_EXTRUDE13_DEPTH, mode=Mode.SUBTRACT)

    # Fillet11
    # the kernel refuses this fillet: 6 mm, written as the material it takes off along each edge
    with BuildSketch(Plane(origin=(-20.271039429, -27.962867448, -8), x_dir=(0, 0, 1), z_dir=(0.04540766091865005, 0.9989685402102996, 0)), Plane(origin=(20.271039429, -27.962867448, -8), x_dir=(-0.9989685402102996, -0.04540766091865018, 0), z_dir=(-0.04540766091865018, 0.9989685402102996, 0))) as fillet11_piece_1:
        with BuildLine():
            CenterArc((FILLET11_R, FILLET11_R), FILLET11_R, 180, 90)
            Line((0, FILLET11_R), (-FILLET11_R * 0.02, FILLET11_R))
            Line((-FILLET11_R * 0.02, FILLET11_R), (-FILLET11_R * 0.02, -FILLET11_R * 0.02))
            Line((-FILLET11_R * 0.02, -FILLET11_R * 0.02), (FILLET11_R, -FILLET11_R * 0.02))
            Line((FILLET11_R, -FILLET11_R * 0.02), (FILLET11_R, 0))
        make_face()
    extrude(amount=119.048528665, mode=Mode.SUBTRACT)
    with BuildSketch(Plane(origin=(-14.865324207, 90.962867448, 19), x_dir=(0, 0, -1), z_dir=(-0.04540766091865005, -0.9989685402102996, 0)), Plane(origin=(14.865324207, 90.962867448, 19), x_dir=(-0.9989685402102996, -0.04540766091865018, 0), z_dir=(0.04540766091865018, -0.9989685402102996, 0))) as fillet11_piece_2:
        with BuildLine():
            CenterArc((FILLET11_R, FILLET11_R), FILLET11_R, 180, 90)
            Line((0, FILLET11_R), (-FILLET11_R * 0.02, FILLET11_R))
            Line((-FILLET11_R * 0.02, FILLET11_R), (-FILLET11_R * 0.02, -FILLET11_R * 0.02))
            Line((-FILLET11_R * 0.02, -FILLET11_R * 0.02), (FILLET11_R, -FILLET11_R * 0.02))
            Line((FILLET11_R, -FILLET11_R * 0.02), (FILLET11_R, 0))
        make_face()
    extrude(amount=127.056788864, mode=Mode.SUBTRACT)

    # Sketch35 → Boss-Extrude7 (add)
    with BuildSketch(Plane(origin=(0, 0, -2), x_dir=(-1, 0, 0), z_dir=(0, 0, -1))):
        with Locations((0, -34.75)):
            Circle(SKETCH35_R)
        with Locations((0, -34.75)):
            Circle(SKETCH35_R_2, mode=Mode.SUBTRACT)
    extrude(amount=BOSS_EXTRUDE7_DEPTH)

    # Sketch36 → Cut-Extrude14 (cut, symmetric)
    with BuildSketch(Plane(origin=(0, 0, 0), x_dir=(0, 0, -1), z_dir=(1, 0, 0))):
        Polygon((-11, -45), (-11, -53), (-8, -45), align=None)
        Polygon((-11, -4), (-11, 4), (-8, -4), align=None)
    extrude(amount=CUT_EXTRUDE14_DEPTH, both=True, mode=Mode.SUBTRACT)


solid = part.part
